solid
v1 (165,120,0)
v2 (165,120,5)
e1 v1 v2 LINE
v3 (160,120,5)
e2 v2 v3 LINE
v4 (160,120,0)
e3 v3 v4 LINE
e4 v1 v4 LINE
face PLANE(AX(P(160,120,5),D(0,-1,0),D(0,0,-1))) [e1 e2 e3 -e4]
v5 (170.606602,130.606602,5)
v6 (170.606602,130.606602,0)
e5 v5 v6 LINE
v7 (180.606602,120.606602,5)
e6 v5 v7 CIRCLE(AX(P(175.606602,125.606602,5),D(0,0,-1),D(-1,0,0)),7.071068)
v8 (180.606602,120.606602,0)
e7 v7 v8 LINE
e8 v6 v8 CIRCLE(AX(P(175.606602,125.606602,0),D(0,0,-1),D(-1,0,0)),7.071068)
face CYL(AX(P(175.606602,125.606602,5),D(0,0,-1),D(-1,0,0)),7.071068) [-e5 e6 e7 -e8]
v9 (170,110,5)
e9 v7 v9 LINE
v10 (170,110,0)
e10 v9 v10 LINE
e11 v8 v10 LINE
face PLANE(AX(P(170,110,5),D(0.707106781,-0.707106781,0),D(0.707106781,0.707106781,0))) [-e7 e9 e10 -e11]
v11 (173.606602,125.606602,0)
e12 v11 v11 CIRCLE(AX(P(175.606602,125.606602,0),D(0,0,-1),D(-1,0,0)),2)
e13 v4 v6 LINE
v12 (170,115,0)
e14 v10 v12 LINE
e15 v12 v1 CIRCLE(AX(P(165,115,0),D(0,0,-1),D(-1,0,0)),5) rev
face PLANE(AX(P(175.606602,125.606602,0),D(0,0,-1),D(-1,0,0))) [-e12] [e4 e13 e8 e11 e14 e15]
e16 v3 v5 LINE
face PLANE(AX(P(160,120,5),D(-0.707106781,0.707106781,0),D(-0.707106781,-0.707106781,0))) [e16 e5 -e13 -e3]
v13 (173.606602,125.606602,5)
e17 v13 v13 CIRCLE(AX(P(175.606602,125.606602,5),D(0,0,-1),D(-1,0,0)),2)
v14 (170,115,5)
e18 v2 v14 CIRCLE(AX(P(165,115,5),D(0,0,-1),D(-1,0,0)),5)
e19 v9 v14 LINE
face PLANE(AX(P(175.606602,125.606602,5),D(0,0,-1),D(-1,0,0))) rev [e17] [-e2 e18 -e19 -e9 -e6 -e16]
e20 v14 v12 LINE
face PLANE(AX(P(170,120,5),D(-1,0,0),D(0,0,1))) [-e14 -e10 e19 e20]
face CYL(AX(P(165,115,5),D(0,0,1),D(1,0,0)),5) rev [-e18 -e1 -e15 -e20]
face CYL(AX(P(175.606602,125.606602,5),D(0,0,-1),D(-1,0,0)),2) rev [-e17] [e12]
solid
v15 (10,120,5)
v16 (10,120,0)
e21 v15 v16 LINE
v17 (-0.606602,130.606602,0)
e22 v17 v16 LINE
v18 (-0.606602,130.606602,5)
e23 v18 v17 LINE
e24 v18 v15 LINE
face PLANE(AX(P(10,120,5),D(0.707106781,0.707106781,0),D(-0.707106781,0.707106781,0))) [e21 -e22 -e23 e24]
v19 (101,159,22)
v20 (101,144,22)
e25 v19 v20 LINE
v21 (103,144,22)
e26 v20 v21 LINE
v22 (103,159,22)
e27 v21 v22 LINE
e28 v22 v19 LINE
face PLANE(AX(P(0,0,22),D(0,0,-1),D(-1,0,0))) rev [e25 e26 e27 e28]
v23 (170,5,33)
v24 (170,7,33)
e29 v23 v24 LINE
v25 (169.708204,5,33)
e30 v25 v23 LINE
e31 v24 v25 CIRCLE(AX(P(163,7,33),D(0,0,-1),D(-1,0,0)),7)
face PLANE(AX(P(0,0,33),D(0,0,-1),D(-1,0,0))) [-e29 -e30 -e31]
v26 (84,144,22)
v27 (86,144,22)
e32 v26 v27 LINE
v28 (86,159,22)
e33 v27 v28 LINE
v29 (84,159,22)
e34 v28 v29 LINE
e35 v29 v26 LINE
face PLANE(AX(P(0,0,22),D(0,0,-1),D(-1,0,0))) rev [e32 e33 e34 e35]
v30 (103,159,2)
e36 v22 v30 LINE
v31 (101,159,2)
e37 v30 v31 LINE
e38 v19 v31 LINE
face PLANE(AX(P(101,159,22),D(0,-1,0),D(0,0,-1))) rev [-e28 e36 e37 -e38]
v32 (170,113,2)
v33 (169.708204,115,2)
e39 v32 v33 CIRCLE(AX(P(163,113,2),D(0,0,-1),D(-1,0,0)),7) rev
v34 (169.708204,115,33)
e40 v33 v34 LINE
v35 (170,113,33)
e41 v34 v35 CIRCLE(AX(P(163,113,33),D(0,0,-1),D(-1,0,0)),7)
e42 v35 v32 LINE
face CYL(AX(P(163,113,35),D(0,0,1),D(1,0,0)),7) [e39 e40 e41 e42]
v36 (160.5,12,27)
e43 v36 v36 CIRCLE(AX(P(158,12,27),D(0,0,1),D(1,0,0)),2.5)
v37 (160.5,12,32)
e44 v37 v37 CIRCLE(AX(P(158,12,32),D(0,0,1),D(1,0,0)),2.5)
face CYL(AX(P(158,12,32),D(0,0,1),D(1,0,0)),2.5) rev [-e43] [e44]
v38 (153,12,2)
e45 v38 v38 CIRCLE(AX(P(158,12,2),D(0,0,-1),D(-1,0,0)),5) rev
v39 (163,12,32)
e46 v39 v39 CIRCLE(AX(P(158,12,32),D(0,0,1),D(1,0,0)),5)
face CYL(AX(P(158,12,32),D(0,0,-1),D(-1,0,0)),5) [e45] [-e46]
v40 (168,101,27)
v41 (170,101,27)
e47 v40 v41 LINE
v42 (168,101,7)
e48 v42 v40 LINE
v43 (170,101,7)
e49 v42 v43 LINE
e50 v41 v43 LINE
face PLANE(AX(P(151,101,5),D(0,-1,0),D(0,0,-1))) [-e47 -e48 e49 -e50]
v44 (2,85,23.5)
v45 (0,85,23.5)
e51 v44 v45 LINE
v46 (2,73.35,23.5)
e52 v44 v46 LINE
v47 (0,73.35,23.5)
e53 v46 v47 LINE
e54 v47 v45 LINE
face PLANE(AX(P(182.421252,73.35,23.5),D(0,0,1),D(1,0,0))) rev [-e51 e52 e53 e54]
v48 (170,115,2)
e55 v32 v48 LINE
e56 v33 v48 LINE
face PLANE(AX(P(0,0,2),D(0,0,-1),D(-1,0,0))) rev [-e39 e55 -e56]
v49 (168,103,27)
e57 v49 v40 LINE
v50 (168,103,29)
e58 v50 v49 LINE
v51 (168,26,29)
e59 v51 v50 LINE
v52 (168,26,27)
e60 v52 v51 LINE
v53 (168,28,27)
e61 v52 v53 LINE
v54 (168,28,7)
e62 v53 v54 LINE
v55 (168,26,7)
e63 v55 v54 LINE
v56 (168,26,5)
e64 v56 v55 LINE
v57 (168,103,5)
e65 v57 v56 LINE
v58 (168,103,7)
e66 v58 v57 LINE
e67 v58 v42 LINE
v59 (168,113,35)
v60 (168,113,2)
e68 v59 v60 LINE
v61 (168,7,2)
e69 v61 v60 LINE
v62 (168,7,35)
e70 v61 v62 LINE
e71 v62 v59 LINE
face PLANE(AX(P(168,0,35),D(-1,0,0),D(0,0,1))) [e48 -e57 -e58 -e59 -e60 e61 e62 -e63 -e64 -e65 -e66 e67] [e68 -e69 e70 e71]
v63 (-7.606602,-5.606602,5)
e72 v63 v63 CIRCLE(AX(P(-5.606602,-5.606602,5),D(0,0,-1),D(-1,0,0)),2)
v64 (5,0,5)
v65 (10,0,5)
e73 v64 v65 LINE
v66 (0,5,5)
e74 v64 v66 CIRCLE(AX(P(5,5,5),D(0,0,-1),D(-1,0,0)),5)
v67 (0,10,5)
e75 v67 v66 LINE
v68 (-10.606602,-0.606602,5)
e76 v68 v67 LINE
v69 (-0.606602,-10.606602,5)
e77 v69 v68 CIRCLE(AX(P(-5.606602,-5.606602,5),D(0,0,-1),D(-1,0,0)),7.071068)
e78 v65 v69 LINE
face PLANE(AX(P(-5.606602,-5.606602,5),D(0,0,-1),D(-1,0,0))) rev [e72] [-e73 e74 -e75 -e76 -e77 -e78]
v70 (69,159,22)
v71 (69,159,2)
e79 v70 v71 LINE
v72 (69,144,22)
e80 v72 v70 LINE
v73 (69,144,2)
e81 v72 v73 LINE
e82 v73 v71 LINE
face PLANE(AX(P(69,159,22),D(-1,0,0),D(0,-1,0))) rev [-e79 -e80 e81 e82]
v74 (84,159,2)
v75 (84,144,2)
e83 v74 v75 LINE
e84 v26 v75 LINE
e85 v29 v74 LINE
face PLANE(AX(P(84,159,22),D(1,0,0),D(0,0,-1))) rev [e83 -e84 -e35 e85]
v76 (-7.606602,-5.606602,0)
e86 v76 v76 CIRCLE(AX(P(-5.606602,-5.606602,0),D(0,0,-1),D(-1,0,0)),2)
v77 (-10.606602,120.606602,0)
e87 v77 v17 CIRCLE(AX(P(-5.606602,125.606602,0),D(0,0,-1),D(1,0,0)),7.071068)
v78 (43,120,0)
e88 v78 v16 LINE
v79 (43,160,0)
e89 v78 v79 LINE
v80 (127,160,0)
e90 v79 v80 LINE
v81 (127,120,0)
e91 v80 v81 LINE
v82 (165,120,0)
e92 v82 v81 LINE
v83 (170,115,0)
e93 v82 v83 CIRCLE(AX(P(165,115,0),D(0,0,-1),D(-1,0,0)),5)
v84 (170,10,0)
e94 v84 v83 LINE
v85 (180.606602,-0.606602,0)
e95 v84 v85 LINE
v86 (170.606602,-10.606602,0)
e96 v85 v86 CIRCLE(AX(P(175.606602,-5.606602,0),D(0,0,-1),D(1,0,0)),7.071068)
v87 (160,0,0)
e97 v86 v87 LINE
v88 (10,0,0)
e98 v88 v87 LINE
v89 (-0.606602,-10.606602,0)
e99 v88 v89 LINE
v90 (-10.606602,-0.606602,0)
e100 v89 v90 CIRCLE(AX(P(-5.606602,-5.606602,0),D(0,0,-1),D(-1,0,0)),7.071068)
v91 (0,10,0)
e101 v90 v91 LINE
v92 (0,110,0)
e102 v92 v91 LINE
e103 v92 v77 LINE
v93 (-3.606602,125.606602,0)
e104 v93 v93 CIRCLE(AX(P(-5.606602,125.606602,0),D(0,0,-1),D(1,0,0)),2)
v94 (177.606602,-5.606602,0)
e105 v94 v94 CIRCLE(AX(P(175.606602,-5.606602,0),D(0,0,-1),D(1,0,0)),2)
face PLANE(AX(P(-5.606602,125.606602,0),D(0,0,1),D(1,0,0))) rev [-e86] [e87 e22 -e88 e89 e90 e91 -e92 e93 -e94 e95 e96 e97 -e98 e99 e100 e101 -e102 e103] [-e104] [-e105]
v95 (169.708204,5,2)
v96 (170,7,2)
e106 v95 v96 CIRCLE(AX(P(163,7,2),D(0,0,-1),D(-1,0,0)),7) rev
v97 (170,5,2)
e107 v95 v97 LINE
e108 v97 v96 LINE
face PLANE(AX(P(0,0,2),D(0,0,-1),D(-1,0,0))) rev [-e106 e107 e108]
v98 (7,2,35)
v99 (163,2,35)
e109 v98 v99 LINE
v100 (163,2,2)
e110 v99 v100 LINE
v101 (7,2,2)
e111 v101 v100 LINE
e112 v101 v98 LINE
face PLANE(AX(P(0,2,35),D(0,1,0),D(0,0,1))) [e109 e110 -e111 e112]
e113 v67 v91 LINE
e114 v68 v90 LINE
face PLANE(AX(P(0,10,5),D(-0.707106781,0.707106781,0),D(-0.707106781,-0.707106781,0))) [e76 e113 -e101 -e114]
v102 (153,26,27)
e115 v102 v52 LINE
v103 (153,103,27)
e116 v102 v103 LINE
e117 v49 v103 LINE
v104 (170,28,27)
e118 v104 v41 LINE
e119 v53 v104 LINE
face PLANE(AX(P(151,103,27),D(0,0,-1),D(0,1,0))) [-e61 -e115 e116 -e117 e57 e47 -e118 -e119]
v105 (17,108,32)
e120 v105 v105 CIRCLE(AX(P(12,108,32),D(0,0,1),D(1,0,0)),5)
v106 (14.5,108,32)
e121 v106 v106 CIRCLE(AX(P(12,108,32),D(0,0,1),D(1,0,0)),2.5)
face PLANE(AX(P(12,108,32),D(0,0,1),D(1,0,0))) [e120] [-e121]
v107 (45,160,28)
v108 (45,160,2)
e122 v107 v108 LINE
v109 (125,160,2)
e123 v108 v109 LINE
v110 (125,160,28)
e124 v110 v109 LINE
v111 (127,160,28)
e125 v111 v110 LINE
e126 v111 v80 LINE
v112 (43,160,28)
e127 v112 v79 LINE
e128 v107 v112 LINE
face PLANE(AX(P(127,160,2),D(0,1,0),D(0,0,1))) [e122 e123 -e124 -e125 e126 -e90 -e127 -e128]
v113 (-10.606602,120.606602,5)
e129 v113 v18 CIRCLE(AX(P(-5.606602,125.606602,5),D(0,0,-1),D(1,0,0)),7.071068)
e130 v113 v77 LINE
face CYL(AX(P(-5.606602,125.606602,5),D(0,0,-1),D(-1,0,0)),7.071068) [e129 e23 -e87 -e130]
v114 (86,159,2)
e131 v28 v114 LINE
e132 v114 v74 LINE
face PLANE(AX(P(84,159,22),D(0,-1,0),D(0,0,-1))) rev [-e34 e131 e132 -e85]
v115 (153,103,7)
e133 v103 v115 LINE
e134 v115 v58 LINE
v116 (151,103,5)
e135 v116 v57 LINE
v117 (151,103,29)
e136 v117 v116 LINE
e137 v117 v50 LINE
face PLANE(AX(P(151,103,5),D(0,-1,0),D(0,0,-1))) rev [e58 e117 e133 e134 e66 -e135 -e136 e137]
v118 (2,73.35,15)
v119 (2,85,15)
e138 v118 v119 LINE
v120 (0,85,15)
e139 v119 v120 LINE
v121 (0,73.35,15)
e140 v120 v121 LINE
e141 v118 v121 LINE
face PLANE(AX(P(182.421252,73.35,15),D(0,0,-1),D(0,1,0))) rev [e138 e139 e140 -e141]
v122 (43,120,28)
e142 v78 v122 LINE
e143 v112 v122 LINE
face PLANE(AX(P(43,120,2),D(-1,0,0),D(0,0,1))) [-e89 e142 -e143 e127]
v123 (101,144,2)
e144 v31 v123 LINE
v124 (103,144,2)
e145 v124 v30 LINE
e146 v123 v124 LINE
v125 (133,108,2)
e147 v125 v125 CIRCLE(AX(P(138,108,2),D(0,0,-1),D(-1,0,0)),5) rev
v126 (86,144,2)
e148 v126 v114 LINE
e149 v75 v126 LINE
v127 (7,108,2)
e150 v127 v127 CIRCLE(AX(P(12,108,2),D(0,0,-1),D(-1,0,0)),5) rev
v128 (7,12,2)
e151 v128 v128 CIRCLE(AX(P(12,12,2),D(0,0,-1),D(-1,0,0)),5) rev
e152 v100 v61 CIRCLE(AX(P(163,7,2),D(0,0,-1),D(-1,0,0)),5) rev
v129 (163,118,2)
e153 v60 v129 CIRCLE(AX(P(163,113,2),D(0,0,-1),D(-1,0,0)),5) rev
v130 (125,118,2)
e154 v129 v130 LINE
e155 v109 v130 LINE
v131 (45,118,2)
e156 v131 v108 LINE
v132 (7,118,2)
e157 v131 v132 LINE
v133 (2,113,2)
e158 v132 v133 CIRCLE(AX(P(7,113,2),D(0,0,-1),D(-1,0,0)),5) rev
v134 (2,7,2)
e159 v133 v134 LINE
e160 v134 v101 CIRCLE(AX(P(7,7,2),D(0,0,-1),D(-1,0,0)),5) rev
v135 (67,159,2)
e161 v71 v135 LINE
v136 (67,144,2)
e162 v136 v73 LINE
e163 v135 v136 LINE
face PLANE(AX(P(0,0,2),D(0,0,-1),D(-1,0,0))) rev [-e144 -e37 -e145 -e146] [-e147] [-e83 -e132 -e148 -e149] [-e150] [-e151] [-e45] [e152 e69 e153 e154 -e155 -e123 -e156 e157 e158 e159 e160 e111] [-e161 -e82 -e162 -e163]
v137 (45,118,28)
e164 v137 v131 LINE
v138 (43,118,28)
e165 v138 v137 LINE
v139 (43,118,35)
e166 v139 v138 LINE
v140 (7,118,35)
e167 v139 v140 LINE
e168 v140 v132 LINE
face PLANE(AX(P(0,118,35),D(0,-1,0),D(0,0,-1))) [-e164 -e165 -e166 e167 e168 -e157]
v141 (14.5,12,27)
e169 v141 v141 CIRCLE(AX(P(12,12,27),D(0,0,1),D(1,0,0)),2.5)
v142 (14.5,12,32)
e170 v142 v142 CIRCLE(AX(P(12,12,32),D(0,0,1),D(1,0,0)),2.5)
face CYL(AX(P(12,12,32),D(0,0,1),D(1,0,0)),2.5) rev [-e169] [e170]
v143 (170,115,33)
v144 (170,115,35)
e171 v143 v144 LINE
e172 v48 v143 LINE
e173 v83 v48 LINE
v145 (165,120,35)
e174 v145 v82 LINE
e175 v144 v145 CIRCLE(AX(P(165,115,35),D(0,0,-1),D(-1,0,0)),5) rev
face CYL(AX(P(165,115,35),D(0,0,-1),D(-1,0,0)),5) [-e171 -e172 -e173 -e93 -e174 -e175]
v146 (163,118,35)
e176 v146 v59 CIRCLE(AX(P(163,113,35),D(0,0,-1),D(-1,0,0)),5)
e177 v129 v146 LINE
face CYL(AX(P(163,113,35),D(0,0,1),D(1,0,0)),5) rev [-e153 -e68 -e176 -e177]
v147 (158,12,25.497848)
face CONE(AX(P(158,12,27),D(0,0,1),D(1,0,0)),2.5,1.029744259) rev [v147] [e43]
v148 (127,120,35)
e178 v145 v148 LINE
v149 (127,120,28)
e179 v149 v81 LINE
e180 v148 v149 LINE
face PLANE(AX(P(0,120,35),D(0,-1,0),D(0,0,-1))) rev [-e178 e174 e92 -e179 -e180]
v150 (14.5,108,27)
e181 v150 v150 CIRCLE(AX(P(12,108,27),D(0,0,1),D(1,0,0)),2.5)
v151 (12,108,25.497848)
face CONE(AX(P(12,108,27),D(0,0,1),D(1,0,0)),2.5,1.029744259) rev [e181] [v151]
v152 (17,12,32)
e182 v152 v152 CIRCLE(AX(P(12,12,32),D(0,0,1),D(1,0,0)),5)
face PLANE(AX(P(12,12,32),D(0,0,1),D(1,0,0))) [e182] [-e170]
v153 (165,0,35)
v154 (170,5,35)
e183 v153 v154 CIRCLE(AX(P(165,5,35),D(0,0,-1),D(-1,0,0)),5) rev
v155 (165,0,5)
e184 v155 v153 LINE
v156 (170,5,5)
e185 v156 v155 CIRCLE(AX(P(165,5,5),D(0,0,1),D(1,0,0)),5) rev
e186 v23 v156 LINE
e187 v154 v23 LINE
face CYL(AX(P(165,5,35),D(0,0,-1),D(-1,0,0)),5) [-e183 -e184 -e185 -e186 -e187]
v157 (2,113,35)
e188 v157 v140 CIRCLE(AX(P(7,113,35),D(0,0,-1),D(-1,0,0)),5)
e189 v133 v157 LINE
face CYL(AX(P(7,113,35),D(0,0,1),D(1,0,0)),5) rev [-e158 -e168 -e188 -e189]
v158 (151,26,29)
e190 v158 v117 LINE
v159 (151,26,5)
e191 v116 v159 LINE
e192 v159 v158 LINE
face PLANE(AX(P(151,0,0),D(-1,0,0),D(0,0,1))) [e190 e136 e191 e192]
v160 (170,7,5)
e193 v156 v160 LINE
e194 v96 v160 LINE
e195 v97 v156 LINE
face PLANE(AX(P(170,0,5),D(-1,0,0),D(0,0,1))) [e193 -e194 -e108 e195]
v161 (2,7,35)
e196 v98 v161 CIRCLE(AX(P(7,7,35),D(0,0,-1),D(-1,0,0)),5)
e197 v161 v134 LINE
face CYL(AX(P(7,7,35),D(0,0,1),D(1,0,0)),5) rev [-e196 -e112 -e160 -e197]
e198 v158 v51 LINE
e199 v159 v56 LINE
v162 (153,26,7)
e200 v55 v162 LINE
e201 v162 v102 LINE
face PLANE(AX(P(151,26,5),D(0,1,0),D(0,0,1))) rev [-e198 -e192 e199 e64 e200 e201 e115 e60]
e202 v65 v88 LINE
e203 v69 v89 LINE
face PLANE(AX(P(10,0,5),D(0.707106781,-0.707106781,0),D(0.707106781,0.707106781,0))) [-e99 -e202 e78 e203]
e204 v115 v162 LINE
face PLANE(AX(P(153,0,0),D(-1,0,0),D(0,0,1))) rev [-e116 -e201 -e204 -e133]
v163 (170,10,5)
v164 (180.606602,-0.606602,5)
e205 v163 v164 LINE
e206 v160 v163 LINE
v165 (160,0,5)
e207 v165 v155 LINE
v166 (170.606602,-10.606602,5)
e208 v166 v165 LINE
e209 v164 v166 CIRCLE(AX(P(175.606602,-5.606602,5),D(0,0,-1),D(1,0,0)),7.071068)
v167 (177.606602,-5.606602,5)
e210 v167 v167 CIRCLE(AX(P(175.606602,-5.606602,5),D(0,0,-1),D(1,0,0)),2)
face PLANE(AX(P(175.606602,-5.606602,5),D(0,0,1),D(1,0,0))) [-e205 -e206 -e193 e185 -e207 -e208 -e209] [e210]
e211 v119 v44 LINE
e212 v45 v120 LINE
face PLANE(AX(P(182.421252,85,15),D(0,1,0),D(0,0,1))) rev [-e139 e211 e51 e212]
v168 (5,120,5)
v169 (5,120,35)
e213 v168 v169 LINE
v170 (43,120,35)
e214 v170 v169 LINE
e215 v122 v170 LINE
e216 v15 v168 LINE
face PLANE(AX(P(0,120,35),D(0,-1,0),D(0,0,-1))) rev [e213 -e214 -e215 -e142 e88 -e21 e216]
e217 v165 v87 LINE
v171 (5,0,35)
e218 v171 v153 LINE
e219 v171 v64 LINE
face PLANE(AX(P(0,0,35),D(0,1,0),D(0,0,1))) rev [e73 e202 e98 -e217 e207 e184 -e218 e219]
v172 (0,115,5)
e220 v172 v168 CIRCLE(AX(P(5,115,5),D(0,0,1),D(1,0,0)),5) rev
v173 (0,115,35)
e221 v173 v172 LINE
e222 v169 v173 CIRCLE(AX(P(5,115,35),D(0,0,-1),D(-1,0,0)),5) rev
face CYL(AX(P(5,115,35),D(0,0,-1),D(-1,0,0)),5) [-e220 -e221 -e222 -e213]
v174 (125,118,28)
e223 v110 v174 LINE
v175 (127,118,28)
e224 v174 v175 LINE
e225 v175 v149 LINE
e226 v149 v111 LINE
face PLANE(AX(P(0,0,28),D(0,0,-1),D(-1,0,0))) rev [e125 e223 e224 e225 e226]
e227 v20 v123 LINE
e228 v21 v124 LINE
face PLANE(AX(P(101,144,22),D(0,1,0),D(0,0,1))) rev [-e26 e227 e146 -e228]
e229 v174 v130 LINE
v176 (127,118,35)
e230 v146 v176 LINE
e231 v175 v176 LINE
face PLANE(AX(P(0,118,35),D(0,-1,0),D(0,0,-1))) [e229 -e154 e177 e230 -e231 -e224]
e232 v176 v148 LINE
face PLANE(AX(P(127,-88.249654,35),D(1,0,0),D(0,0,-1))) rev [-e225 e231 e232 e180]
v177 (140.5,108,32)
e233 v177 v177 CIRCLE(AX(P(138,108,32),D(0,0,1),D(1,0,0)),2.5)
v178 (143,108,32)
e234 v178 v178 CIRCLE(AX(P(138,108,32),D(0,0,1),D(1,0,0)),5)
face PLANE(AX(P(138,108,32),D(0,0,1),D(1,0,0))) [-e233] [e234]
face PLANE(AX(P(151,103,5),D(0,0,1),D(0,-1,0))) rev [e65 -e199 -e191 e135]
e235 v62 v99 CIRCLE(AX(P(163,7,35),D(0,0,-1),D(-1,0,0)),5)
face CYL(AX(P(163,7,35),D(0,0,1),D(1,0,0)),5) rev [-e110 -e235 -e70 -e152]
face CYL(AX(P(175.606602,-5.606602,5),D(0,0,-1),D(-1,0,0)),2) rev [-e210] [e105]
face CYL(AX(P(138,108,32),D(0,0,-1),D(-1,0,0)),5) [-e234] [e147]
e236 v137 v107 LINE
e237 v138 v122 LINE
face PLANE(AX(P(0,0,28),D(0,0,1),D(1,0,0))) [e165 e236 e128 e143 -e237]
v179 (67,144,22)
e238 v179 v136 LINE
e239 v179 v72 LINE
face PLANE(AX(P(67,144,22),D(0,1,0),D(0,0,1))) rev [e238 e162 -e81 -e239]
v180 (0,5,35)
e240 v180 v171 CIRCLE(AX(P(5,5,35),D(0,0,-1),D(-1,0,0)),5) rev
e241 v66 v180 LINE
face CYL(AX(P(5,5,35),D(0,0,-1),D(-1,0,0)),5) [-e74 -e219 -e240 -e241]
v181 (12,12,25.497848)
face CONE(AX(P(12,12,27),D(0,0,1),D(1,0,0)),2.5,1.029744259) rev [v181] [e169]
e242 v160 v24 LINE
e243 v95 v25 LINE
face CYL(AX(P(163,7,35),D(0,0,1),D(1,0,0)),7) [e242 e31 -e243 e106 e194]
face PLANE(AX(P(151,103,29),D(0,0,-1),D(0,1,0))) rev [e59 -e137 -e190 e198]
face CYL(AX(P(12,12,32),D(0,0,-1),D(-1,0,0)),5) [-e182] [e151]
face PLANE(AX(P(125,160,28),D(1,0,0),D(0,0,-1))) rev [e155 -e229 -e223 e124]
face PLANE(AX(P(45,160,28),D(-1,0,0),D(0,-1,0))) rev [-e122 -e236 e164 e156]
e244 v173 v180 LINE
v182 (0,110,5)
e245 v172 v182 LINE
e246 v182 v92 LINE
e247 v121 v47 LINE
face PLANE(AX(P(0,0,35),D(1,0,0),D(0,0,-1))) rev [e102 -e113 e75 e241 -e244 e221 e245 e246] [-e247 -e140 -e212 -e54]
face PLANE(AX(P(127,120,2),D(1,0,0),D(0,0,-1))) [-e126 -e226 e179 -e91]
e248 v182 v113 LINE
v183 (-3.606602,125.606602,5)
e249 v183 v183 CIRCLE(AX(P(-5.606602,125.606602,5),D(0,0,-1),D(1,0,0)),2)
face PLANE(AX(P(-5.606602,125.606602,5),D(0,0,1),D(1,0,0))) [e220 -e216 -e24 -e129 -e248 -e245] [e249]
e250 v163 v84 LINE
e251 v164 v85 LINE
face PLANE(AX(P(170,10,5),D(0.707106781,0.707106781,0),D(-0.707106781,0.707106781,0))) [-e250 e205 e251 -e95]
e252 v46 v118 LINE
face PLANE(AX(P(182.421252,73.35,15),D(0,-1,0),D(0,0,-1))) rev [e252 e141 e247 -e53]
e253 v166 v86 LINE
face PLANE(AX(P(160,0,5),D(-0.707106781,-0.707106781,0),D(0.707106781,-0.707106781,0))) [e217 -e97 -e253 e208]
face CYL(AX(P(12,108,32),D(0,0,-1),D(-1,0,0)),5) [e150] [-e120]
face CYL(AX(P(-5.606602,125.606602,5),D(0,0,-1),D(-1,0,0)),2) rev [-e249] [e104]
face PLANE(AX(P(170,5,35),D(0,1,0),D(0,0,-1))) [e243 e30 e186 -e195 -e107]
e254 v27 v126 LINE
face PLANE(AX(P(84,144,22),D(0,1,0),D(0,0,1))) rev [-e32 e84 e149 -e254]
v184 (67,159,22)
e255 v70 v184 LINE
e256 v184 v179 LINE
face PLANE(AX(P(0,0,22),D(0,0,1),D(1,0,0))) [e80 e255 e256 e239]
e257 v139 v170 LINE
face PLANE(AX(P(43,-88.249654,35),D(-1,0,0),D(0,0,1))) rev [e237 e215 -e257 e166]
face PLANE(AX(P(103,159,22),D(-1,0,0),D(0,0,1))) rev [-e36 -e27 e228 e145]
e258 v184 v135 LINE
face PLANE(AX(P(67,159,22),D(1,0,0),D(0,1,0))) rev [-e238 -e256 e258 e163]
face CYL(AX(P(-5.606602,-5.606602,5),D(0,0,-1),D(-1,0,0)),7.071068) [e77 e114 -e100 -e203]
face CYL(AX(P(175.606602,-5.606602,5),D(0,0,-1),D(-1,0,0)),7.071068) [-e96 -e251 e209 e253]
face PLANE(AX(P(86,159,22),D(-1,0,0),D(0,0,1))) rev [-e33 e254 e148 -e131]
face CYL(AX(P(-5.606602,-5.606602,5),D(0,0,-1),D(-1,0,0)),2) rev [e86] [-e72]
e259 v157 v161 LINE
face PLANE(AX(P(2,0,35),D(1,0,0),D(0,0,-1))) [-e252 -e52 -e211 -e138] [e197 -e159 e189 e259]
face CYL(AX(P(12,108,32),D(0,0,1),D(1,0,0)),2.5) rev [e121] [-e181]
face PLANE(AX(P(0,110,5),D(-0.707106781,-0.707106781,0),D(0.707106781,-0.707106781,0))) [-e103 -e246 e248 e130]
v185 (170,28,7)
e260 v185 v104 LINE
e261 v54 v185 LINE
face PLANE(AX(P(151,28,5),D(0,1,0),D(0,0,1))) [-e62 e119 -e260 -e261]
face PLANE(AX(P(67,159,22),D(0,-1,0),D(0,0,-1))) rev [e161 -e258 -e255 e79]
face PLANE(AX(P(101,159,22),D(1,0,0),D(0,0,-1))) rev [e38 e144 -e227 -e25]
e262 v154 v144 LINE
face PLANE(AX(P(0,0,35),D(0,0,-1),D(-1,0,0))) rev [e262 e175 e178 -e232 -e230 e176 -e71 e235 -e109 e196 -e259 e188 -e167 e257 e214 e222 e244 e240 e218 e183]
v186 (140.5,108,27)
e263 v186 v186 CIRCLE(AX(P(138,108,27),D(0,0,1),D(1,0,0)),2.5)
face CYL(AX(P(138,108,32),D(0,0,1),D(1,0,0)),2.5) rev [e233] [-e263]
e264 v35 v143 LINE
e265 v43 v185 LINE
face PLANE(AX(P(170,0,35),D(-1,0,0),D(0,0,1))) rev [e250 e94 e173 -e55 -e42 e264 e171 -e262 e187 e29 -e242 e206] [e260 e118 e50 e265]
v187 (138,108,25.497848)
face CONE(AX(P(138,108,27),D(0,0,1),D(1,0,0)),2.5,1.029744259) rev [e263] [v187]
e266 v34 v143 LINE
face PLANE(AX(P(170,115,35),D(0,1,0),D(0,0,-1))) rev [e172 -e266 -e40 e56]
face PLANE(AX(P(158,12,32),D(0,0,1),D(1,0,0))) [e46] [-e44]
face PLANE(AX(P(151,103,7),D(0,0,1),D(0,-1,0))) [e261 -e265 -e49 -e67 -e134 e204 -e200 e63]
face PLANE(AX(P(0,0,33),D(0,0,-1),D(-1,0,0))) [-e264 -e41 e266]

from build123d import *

# Parameters (mm, degrees)
SKETCH1_W                      = 170
SKETCH1_H                      = 120
BOSS_EXTRUDE1_DEPTH            = 35
SHELL1_T                       = -2
SKETCH2_R                      = 2
BOSS_EXTRUDE2_DEPTH            = 5
BOSS_EXTRUDE2_2_DEPTH          = 5
BOSS_EXTRUDE2_3_DEPTH          = 5
BOSS_EXTRUDE2_4_DEPTH          = 5
SKETCH3_W                      = 8.5
SKETCH3_H                      = 11.65
CUT_EXTRUDE1_DEPTH             = 168
SKETCH4_W                      = 84
SKETCH4_H                      = 33
CUT_EXTRUDE2_DEPTH             = 118
FILLET1_R                      = 5
FILLET2_R                      = 5
SKETCH5_W                      = 84
SKETCH5_H                      = 40
BOSS_EXTRUDE3_DEPTH            = 2
FILLET3_R                      = 5
FILLET4_R                      = 5
FILLET5_R                      = 5
FILLET6_R                      = 5
SKETCH9_W                      = 2
SKETCH9_H                      = 15
BOSS_EXTRUDE4_DEPTH            = 20
SKETCH10_W                     = 2
SKETCH10_H                     = 42
BOSS_EXTRUDE5_DEPTH            = 26
SKETCH13_W                     = 24
SKETCH13_H                     = 77
BOSS_EXTRUDE7_DEPTH            = 17
SHELL2_START                   = 7
SHELL2_OUTLINE_W               = 17
SHELL2_OUTLINE_H               = 73
SHELL2_DEPTH                   = 20
SHELL2_START_2                 = 2
SHELL2_2_DEPTH                 = 31
SKETCH14_W                     = 15
SKETCH14_H                     = 20
CUT_EXTRUDE4_DEPTH             = 5
SKETCH15_W                     = 15
SKETCH15_H                     = 20
CUT_EXTRUDE5_DEPTH             = 5
SKETCH21_R                     = 5
BOSS_EXTRUDE8_DEPTH            = 30
F_5_0MM_DOWEL_HOLE2_AT_2_COUNT = 2
F_5_0MM_DOWEL_HOLE2_AT_2_PITCH = 158.404545389


# Read off the part's stored shape, not the designer's step: Shell2
with BuildPart() as part:
    # Sketch1 → Boss-Extrude1 (new body)
    with BuildSketch(Plane.XY):
        with Locations((85, 60)):
            Rectangle(SKETCH1_W, SKETCH1_H)
    extrude(amount=BOSS_EXTRUDE1_DEPTH)

    # Shell1
    shell1_openings = [part.faces().sort_by_distance(p)[0] for p in [
        (85, 60, 35),
    ]]
    offset(amount=SHELL1_T, openings=shell1_openings, kind=Kind.INTERSECTION)

    # Sketch3 → Cut-Extrude1 (cut)
    with BuildSketch(Plane.ZY):
        with Locations((19.25, 79.175)):
            Rectangle(SKETCH3_W, SKETCH3_H)
    extrude(amount=-CUT_EXTRUDE1_DEPTH, mode=Mode.SUBTRACT)

    # Sketch4 → Cut-Extrude2 (cut)
    with BuildSketch(Plane(origin=(0, 120, 0), x_dir=(1, 0, 0), z_dir=(0, 1, 0))):
        with Locations((85, -18.5)):
            Rectangle(SKETCH4_W, SKETCH4_H)
    extrude(amount=-CUT_EXTRUDE2_DEPTH, mode=Mode.SUBTRACT)

    # Fillet1
    fillet1_edges = [part.edges().sort_by_distance(p)[0] for p in [
        (0, 120, 17.5),
        (170, 120, 17.5),
        (170, 0, 17.5),
        (0, 0, 17.5),
    ]]
    fillet(fillet1_edges, radius=FILLET1_R)

    # Fillet2
    fillet2_edges = [part.edges().sort_by_distance(p)[0] for p in [
        (2, 118, 18.5),
        (2, 2, 18.5),
        (168, 2, 18.5),
        (168, 118, 18.5),
    ]]
    fillet(fillet2_edges, radius=FILLET2_R)

    # Sketch5 → Boss-Extrude3 (add)
    with BuildSketch(Plane(origin=(0, 0, 0), x_dir=(-1, 0, 0), z_dir=(0, 0, -1))):
        with Locations((-85, 140)):
            Rectangle(SKETCH5_W, SKETCH5_H)
    extrude(amount=-BOSS_EXTRUDE3_DEPTH)

    # Sketch9 → Boss-Extrude4 (add)
    with BuildSketch(Plane.XY.offset(2)):
        with Locations((68, 151.5)):
            Rectangle(SKETCH9_W, SKETCH9_H)
        with Locations((85, 151.5)):
            Rectangle(SKETCH9_W, SKETCH9_H)
        with Locations((102, 151.5)):
            Rectangle(SKETCH9_W, SKETCH9_H)
    extrude(amount=BOSS_EXTRUDE4_DEPTH)

    # Sketch10 → Boss-Extrude5 (add)
    with BuildSketch(Plane.XY.offset(2)):
        with Locations((44, 139)):
            Rectangle(SKETCH10_W, SKETCH10_H)
        with Locations((126, 139)):
            Rectangle(SKETCH10_W, SKETCH10_H)
    extrude(amount=BOSS_EXTRUDE5_DEPTH)

    # Sketch13 → Boss-Extrude7 (add)
    with BuildSketch(Plane.ZY.offset(-168)):
        with Locations((17, 64.5)):
            Rectangle(SKETCH13_W, SKETCH13_H)
    extrude(amount=BOSS_EXTRUDE7_DEPTH)

    # Shell2 outline → Shell2 (cut)
    with BuildSketch(Plane.XY.offset(SHELL2_START)):
        with Locations((161.5, 64.5)):
            Rectangle(SHELL2_OUTLINE_W, SHELL2_OUTLINE_H)
        with BuildLine():
            ThreePointArc((169.708203932, 115), (169.926666858, 114.010587075), (170, 113))
            Line((170, 113), (170, 115))
            Line((170, 115), (169.708203932, 115))
        make_face()
        with BuildLine():
            Line((170, 5), (170, 7))
            ThreePointArc((170, 7), (169.926666858, 5.989412925), (169.708203932, 5))
            Line((169.708203932, 5), (170, 5))
        make_face()
    extrude(amount=SHELL2_DEPTH, mode=Mode.SUBTRACT)

    # Shell2 2 outline → Shell2 2 (cut)
    with BuildSketch(Plane.XY.offset(SHELL2_START_2)):
        with BuildLine():
            ThreePointArc((169.708203932, 115), (169.926666858, 114.010587075), (170, 113))
            Line((170, 113), (170, 115))
            Line((170, 115), (169.708203932, 115))
        make_face()
        with BuildLine():
            Line((170, 5), (170, 7))
            ThreePointArc((170, 7), (169.926666858, 5.989412925), (169.708203932, 5))
            Line((169.708203932, 5), (170, 5))
        make_face()
    extrude(amount=SHELL2_2_DEPTH, mode=Mode.SUBTRACT)

    # Sketch14 → Cut-Extrude4 (cut)
    with BuildSketch(Plane.XZ.offset(-101)):
        with Locations((160.5, 17)):
            Rectangle(SKETCH14_W, SKETCH14_H)
    extrude(amount=-CUT_EXTRUDE4_DEPTH, mode=Mode.SUBTRACT)

    # Sketch15 → Cut-Extrude5 (cut)
    with BuildSketch(Plane(origin=(0, 28, 0), x_dir=(1, 0, 0), z_dir=(0, 1, 0))):
        with Locations((160.5, -17)):
            Rectangle(SKETCH15_W, SKETCH15_H)
    extrude(amount=-CUT_EXTRUDE5_DEPTH, mode=Mode.SUBTRACT)


with BuildPart() as body_2:
    # Sketch2 → Boss-Extrude2 (new body)
    with BuildSketch(Plane(origin=(0, 0, 0), x_dir=(-1, 0, 0), z_dir=(0, 0, -1))):
        with BuildLine():
            Line((-160, 120), (-170.606601718, 130.606601718))
            ThreePointArc((-170.606601718, 130.606601718), (-180.606601718, 130.606601718), (-180.606601718, 120.606601718))
            Line((-180.606601718, 120.606601718), (-170, 110))
            Line((-170, 110), (-170, 120))
            Line((-170, 120), (-160, 120))
        make_face()
        with Locations((-175.606601718, 125.606601718)):
            Circle(SKETCH2_R, mode=Mode.SUBTRACT)
    extrude(amount=-BOSS_EXTRUDE2_DEPTH)

    # Fillet3
    fillet3_edges = [body_2.edges().sort_by_distance(p)[0] for p in [
        (170, 120, 2.5),
    ]]
    fillet(fillet3_edges, radius=FILLET3_R)


with BuildPart() as body_3:
    # Sketch2 → Boss-Extrude2 2 (new body)
    with BuildSketch(Plane(origin=(0, 0, 0), x_dir=(-1, 0, 0), z_dir=(0, 0, -1))):
        with BuildLine():
            Line((0, 110), (10.606601718, 120.606601718))
            ThreePointArc((10.606601718, 120.606601718), (10.606601718, 130.606601718), (0.606601718, 130.606601718))
            Line((0.606601718, 130.606601718), (-10, 120))
            Line((-10, 120), (0, 120))
            Line((0, 120), (0, 110))
        make_face()
        with Locations(Location((5.606601718, 125.606601718, 0), (0, 0, 180))):
            Circle(SKETCH2_R, mode=Mode.SUBTRACT)
    extrude(amount=-BOSS_EXTRUDE2_2_DEPTH)

    # Fillet4
    fillet4_edges = [body_3.edges().sort_by_distance(p)[0] for p in [
        (0, 120, 2.5),
    ]]
    fillet(fillet4_edges, radius=FILLET4_R)


    add(part.part)  # Boss-Extrude8 merges part


with BuildPart() as body_4:
    # Sketch2 → Boss-Extrude2 3 (new body)
    with BuildSketch(Plane(origin=(0, 0, 0), x_dir=(-1, 0, 0), z_dir=(0, 0, -1))):
        with BuildLine():
            Line((-10, 0), (0.606601718, -10.606601718))
            ThreePointArc((0.606601718, -10.606601718), (10.606601718, -10.606601718), (10.606601718, -0.606601718))
            Line((10.606601718, -0.606601718), (0, 10))
            Line((0, 10), (0, 0))
            Line((0, 0), (-10, 0))
        make_face()
        with Locations((5.606601718, -5.606601718)):
            Circle(SKETCH2_R, mode=Mode.SUBTRACT)
    extrude(amount=-BOSS_EXTRUDE2_3_DEPTH)

    # Fillet5
    fillet5_edges = [body_4.edges().sort_by_distance(p)[0] for p in [
        (0, 0, 2.5),
    ]]
    fillet(fillet5_edges, radius=FILLET5_R)


with BuildPart() as body_5:
    # Sketch2 → Boss-Extrude2 4 (new body)
    with BuildSketch(Plane(origin=(0, 0, 0), x_dir=(-1, 0, 0), z_dir=(0, 0, -1))):
        with BuildLine():
            Line((-170, 10), (-180.606601718, -0.606601718))
            ThreePointArc((-180.606601718, -0.606601718), (-180.606601718, -10.606601718), (-170.606601718, -10.606601718))
            Line((-170.606601718, -10.606601718), (-160, 0))
            Line((-160, 0), (-170, 0))
            Line((-170, 0), (-170, 10))
        make_face()
        with Locations(Location((-175.606601718, -5.606601718, 0), (0, 0, 180))):
            Circle(SKETCH2_R, mode=Mode.SUBTRACT)
    extrude(amount=-BOSS_EXTRUDE2_4_DEPTH)

    # Fillet6
    fillet6_edges = [body_5.edges().sort_by_distance(p)[0] for p in [
        (170, 0, 2.5),
    ]]
    fillet(fillet6_edges, radius=FILLET6_R)


with BuildPart() as body_3_1:
    add(body_3.part)

    add(body_4.part)  # Boss-Extrude8 merges body 4

    add(body_5.part)  # Boss-Extrude8 merges body 5
    # Sketch21 → Boss-Extrude8 (add)
    with BuildSketch(Plane.XY.offset(2)):
        with Locations(Location((12, 108, 0), (0, 0, 180))):
            Circle(SKETCH21_R)
        with Locations(Location((138, 108, 0), (0, 0, 180))):
            Circle(SKETCH21_R)
        with Locations(Location((12, 12, 0), (0, 0, 180))):
            Circle(SKETCH21_R)
        with Locations(Location((158, 12, 0), (0, 0, 180))):
            Circle(SKETCH21_R)
    extrude(amount=BOSS_EXTRUDE8_DEPTH)

    # Sketch28 → Ø5.0mm Dowel Hole2 (revolve, cut)
    with BuildSketch(Plane(origin=(138, 108, 32), x_dir=(0, -1, 0), z_dir=(1, 0, 0))):
        Polygon((0, 0), (0, 6.502151548), (2.5, 5), (2.5, 0), align=None)
    f_5_0mm_dowel_hole2 = revolve(axis=Axis((138, 108, 38.35), (0, 0, -1)), mode=Mode.SUBTRACT)

    # Ø5.0mm Dowel Hole2 at 2: Ø5.0mm Dowel Hole2 ×2
    with Locations(*[Vector(-0.7954317200324987, -0.6060432152628561, 0) * (i * F_5_0MM_DOWEL_HOLE2_AT_2_PITCH) for i in range(1, F_5_0MM_DOWEL_HOLE2_AT_2_COUNT)]):
        add(f_5_0mm_dowel_hole2, mode=Mode.SUBTRACT)

    # Sketch30 → Ø5.0mm Dowel Hole4 (revolve, cut)
    with BuildSketch(Plane(origin=(12, 108, 32), x_dir=(0, -1, 0), z_dir=(1, 0, 0))):
        Polygon((0, 0), (0, 6.502151548), (2.5, 5), (2.5, 0), align=None)
    revolve(axis=Axis((12, 108, 38.35), (0, 0, -1)), mode=Mode.SUBTRACT)

    # Sketch31 → Ø5.0mm Dowel Hole5 (revolve, cut)
    with BuildSketch(Plane(origin=(158, 12, 32), x_dir=(0, -1, 0), z_dir=(1, 0, 0))):
        Polygon((0, 0), (0, 6.502151548), (2.5, 5), (2.5, 0), align=None)
    revolve(axis=Axis((158, 12, 38.35), (0, 0, -1)), mode=Mode.SUBTRACT)


solid = Compound([body_2.part, body_3_1.part])
